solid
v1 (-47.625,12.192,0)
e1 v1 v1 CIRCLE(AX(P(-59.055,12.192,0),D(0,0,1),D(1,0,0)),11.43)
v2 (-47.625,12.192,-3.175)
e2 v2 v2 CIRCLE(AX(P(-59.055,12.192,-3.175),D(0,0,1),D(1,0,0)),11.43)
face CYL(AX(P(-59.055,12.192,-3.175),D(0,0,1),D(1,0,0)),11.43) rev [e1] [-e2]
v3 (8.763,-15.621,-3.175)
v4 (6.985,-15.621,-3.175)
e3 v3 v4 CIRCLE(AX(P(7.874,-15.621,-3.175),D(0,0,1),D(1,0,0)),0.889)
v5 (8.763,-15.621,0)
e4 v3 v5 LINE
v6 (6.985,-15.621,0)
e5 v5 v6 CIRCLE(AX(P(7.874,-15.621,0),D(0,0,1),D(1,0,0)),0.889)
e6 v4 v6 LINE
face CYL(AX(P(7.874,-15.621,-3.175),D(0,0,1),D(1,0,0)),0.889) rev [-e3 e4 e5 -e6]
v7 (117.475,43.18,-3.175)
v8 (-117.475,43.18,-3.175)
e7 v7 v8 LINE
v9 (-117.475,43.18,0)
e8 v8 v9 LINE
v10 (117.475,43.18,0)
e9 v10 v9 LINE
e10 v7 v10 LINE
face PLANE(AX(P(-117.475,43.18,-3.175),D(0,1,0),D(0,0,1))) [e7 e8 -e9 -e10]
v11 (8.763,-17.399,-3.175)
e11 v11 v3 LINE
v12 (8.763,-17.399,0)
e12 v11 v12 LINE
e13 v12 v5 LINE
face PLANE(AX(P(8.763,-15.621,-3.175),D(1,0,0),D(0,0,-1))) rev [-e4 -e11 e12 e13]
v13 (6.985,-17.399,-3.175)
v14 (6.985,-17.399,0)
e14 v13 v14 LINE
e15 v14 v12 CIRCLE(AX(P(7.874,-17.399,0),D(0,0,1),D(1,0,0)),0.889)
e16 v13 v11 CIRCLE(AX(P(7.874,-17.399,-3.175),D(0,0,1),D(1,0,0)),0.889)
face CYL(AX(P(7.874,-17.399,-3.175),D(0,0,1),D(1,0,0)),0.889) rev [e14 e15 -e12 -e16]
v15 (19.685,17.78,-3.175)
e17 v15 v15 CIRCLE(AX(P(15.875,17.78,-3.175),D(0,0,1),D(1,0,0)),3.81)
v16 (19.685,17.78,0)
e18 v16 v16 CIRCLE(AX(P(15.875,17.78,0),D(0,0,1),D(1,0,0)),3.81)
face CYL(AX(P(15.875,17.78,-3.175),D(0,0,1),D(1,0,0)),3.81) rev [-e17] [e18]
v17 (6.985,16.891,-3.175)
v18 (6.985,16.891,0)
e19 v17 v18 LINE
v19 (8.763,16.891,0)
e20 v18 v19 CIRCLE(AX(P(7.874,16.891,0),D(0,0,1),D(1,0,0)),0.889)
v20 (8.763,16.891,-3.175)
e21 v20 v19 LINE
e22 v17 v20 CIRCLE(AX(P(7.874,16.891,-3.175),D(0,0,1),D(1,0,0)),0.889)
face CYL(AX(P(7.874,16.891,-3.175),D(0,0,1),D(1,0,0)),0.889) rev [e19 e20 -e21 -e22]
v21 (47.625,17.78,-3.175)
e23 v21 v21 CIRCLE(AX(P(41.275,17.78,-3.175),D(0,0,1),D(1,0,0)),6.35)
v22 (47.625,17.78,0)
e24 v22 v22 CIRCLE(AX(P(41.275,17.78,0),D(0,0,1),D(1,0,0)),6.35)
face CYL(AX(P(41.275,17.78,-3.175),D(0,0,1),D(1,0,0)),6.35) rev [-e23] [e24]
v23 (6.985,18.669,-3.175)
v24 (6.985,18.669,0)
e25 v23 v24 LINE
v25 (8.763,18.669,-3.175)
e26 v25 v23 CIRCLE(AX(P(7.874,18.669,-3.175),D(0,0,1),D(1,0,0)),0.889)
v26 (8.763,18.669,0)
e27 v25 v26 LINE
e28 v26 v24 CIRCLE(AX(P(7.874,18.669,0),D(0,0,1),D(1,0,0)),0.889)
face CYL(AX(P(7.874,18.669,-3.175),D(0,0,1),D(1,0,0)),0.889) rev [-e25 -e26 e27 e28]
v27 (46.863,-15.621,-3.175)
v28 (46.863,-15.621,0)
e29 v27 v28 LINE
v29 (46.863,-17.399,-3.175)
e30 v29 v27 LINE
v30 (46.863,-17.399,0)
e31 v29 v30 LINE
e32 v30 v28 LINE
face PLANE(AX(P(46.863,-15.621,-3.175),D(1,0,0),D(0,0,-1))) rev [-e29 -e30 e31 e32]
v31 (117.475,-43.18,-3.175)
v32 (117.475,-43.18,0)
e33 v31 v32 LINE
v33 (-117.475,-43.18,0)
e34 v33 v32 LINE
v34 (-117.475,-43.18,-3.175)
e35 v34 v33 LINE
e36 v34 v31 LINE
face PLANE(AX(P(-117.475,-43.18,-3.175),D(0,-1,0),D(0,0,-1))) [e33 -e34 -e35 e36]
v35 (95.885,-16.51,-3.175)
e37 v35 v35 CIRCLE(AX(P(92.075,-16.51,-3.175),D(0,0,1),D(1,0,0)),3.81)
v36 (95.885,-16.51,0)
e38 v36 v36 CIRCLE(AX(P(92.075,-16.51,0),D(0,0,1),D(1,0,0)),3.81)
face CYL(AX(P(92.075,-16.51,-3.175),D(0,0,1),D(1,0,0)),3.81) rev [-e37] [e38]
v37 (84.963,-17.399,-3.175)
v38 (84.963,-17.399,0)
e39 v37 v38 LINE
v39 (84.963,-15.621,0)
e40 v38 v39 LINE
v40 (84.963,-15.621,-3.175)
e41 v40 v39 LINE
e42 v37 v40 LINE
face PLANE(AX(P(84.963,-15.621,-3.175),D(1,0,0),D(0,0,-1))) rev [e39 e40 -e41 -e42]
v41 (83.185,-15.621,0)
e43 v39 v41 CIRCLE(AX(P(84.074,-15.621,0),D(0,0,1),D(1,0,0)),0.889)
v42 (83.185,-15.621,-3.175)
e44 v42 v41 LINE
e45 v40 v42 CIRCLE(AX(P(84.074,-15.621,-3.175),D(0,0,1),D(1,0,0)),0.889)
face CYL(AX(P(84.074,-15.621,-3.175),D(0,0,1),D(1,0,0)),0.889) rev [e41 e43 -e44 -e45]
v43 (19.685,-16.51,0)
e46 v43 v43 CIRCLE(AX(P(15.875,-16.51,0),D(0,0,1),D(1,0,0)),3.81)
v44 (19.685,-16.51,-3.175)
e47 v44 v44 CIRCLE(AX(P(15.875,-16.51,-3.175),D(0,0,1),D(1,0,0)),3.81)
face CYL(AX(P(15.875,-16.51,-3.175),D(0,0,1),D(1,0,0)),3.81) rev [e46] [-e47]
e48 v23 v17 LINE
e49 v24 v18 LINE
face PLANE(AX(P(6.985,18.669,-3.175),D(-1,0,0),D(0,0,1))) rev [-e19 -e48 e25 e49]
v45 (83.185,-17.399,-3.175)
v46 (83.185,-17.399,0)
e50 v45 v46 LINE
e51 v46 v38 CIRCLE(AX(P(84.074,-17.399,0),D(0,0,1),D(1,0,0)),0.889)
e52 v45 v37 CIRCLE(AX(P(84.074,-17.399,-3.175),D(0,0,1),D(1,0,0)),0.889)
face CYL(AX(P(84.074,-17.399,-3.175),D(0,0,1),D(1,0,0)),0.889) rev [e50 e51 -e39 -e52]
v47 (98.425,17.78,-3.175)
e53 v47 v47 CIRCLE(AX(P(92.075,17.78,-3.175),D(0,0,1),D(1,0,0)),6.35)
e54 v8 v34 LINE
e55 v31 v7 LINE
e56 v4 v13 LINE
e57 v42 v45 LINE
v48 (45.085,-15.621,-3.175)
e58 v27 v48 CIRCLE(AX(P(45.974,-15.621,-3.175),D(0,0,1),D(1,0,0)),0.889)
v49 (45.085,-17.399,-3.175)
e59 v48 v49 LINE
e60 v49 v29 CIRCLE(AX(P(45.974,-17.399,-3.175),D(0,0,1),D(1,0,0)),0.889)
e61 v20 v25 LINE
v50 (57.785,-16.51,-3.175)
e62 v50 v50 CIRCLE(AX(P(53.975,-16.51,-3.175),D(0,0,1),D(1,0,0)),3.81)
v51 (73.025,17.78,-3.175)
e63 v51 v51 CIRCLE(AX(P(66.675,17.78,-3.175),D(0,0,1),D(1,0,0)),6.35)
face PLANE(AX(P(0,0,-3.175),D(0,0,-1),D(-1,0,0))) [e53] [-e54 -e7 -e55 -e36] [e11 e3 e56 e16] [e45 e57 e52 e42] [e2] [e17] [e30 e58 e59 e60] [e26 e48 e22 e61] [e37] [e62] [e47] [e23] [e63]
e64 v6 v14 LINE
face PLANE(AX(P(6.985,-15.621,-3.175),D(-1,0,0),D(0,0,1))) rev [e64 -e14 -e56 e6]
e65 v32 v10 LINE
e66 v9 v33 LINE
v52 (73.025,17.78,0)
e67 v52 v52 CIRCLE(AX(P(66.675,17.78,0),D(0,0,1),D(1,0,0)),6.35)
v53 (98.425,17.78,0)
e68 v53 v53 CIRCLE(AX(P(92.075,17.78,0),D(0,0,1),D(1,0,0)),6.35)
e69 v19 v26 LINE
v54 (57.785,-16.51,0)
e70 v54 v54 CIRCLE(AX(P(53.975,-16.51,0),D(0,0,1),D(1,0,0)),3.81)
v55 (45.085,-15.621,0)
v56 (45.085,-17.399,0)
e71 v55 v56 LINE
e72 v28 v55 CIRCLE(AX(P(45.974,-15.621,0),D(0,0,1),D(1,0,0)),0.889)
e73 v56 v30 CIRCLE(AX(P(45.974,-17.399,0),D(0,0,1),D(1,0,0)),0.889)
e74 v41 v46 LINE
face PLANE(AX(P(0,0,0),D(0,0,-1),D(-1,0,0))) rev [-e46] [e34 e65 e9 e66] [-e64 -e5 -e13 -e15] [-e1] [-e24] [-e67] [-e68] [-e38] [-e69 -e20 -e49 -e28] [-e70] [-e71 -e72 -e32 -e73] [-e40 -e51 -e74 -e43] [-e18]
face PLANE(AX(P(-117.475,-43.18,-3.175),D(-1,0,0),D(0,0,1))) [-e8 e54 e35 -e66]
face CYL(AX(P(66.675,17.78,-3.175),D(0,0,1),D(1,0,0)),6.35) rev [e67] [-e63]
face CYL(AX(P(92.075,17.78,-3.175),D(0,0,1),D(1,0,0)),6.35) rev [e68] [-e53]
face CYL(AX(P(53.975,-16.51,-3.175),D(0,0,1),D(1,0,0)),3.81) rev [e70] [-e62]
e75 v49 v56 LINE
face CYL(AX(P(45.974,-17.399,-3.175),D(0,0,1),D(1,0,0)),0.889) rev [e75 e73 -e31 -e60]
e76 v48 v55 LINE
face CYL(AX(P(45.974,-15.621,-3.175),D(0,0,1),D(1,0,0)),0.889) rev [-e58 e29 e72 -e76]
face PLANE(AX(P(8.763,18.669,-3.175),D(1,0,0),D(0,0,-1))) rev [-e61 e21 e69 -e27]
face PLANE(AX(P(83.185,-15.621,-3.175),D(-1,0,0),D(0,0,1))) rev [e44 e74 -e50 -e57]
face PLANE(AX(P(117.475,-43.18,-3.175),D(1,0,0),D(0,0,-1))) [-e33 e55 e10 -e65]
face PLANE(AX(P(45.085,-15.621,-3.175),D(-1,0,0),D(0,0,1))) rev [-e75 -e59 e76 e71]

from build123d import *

# Parameters (mm, degrees)
SKETCH1_W          = 234.95
SKETCH1_H          = 86.36
BASE_FLANGE1_DEPTH = 3.175
SKETCH11_R         = 6.35
CUT_EXTRUDE3_DEPTH = 126.199715056
SKETCH12_R         = 3.81
CUT_EXTRUDE4_DEPTH = 126.199715056
SKETCH13_R         = 11.43
CUT_EXTRUDE5_DEPTH = 126.199715056
SKETCH14_R         = 3.81
CUT_EXTRUDE6_DEPTH = 126.199715056


# Sheet-metal steps are written as plain solids
with BuildPart() as part:
    # Sketch1 → Base-Flange1 (new body)
    with BuildSketch(Plane.XY):
        Rectangle(SKETCH1_W, SKETCH1_H)
    extrude(amount=-BASE_FLANGE1_DEPTH)

    # Sketch11 → Cut-Extrude3 (cut, through all)
    with BuildSketch(Plane.XY):
        with Locations((41.275, 17.78)):
            Circle(SKETCH11_R)
        with Locations((66.675, 17.78)):
            Circle(SKETCH11_R)
        with Locations((92.075, 17.78)):
            Circle(SKETCH11_R)
    extrude(amount=-CUT_EXTRUDE3_DEPTH, mode=Mode.SUBTRACT)

    # Sketch12 → Cut-Extrude4 (cut, through all)
    with BuildSketch(Plane.XY):
        with Locations((92.075, -16.51)):
            Circle(SKETCH12_R)
        with Locations((53.975, -16.51)):
            Circle(SKETCH12_R)
        with Locations((15.875, -16.51)):
            Circle(SKETCH12_R)
        with BuildLine():
            Line((8.763, -15.621), (8.763, -17.399))
            ThreePointArc((8.763, -17.399), (7.874, -18.288), (6.985, -17.399))
            Line((6.985, -17.399), (6.985, -15.621))
            ThreePointArc((6.985, -15.621), (7.874, -14.732), (8.763, -15.621))
        make_face()
        with BuildLine():
            Line((46.863, -15.621), (46.863, -17.399))
            ThreePointArc((46.863, -17.399), (45.974, -18.288), (45.085, -17.399))
            Line((45.085, -17.399), (45.085, -15.621))
            ThreePointArc((45.085, -15.621), (45.974, -14.732), (46.863, -15.621))
        make_face()
        with BuildLine():
            Line((84.963, -15.621), (84.963, -17.399))
            ThreePointArc((84.963, -17.399), (84.074, -18.288), (83.185, -17.399))
            Line((83.185, -17.399), (83.185, -15.621))
            ThreePointArc((83.185, -15.621), (84.074, -14.732), (84.963, -15.621))
        make_face()
    extrude(amount=-CUT_EXTRUDE4_DEPTH, mode=Mode.SUBTRACT)

    # Sketch13 → Cut-Extrude5 (cut, through all)
    with BuildSketch(Plane.XY):
        with Locations((-59.055, 12.192)):
            Circle(SKETCH13_R)
    extrude(amount=-CUT_EXTRUDE5_DEPTH, mode=Mode.SUBTRACT)

    # Sketch14 → Cut-Extrude6 (cut, through all)
    with BuildSketch(Plane.XY):
        with Locations((15.875, 17.78)):
            Circle(SKETCH14_R)
        with BuildLine():
            Line((8.763, 18.669), (8.763, 16.891))
            ThreePointArc((8.763, 16.891), (7.874, 16.002), (6.985, 16.891))
            Line((6.985, 16.891), (6.985, 18.669))
            ThreePointArc((6.985, 18.669), (7.874, 19.558), (8.763, 18.669))
        make_face()
    extrude(amount=-CUT_EXTRUDE6_DEPTH, mode=Mode.SUBTRACT)


solid = part.part
